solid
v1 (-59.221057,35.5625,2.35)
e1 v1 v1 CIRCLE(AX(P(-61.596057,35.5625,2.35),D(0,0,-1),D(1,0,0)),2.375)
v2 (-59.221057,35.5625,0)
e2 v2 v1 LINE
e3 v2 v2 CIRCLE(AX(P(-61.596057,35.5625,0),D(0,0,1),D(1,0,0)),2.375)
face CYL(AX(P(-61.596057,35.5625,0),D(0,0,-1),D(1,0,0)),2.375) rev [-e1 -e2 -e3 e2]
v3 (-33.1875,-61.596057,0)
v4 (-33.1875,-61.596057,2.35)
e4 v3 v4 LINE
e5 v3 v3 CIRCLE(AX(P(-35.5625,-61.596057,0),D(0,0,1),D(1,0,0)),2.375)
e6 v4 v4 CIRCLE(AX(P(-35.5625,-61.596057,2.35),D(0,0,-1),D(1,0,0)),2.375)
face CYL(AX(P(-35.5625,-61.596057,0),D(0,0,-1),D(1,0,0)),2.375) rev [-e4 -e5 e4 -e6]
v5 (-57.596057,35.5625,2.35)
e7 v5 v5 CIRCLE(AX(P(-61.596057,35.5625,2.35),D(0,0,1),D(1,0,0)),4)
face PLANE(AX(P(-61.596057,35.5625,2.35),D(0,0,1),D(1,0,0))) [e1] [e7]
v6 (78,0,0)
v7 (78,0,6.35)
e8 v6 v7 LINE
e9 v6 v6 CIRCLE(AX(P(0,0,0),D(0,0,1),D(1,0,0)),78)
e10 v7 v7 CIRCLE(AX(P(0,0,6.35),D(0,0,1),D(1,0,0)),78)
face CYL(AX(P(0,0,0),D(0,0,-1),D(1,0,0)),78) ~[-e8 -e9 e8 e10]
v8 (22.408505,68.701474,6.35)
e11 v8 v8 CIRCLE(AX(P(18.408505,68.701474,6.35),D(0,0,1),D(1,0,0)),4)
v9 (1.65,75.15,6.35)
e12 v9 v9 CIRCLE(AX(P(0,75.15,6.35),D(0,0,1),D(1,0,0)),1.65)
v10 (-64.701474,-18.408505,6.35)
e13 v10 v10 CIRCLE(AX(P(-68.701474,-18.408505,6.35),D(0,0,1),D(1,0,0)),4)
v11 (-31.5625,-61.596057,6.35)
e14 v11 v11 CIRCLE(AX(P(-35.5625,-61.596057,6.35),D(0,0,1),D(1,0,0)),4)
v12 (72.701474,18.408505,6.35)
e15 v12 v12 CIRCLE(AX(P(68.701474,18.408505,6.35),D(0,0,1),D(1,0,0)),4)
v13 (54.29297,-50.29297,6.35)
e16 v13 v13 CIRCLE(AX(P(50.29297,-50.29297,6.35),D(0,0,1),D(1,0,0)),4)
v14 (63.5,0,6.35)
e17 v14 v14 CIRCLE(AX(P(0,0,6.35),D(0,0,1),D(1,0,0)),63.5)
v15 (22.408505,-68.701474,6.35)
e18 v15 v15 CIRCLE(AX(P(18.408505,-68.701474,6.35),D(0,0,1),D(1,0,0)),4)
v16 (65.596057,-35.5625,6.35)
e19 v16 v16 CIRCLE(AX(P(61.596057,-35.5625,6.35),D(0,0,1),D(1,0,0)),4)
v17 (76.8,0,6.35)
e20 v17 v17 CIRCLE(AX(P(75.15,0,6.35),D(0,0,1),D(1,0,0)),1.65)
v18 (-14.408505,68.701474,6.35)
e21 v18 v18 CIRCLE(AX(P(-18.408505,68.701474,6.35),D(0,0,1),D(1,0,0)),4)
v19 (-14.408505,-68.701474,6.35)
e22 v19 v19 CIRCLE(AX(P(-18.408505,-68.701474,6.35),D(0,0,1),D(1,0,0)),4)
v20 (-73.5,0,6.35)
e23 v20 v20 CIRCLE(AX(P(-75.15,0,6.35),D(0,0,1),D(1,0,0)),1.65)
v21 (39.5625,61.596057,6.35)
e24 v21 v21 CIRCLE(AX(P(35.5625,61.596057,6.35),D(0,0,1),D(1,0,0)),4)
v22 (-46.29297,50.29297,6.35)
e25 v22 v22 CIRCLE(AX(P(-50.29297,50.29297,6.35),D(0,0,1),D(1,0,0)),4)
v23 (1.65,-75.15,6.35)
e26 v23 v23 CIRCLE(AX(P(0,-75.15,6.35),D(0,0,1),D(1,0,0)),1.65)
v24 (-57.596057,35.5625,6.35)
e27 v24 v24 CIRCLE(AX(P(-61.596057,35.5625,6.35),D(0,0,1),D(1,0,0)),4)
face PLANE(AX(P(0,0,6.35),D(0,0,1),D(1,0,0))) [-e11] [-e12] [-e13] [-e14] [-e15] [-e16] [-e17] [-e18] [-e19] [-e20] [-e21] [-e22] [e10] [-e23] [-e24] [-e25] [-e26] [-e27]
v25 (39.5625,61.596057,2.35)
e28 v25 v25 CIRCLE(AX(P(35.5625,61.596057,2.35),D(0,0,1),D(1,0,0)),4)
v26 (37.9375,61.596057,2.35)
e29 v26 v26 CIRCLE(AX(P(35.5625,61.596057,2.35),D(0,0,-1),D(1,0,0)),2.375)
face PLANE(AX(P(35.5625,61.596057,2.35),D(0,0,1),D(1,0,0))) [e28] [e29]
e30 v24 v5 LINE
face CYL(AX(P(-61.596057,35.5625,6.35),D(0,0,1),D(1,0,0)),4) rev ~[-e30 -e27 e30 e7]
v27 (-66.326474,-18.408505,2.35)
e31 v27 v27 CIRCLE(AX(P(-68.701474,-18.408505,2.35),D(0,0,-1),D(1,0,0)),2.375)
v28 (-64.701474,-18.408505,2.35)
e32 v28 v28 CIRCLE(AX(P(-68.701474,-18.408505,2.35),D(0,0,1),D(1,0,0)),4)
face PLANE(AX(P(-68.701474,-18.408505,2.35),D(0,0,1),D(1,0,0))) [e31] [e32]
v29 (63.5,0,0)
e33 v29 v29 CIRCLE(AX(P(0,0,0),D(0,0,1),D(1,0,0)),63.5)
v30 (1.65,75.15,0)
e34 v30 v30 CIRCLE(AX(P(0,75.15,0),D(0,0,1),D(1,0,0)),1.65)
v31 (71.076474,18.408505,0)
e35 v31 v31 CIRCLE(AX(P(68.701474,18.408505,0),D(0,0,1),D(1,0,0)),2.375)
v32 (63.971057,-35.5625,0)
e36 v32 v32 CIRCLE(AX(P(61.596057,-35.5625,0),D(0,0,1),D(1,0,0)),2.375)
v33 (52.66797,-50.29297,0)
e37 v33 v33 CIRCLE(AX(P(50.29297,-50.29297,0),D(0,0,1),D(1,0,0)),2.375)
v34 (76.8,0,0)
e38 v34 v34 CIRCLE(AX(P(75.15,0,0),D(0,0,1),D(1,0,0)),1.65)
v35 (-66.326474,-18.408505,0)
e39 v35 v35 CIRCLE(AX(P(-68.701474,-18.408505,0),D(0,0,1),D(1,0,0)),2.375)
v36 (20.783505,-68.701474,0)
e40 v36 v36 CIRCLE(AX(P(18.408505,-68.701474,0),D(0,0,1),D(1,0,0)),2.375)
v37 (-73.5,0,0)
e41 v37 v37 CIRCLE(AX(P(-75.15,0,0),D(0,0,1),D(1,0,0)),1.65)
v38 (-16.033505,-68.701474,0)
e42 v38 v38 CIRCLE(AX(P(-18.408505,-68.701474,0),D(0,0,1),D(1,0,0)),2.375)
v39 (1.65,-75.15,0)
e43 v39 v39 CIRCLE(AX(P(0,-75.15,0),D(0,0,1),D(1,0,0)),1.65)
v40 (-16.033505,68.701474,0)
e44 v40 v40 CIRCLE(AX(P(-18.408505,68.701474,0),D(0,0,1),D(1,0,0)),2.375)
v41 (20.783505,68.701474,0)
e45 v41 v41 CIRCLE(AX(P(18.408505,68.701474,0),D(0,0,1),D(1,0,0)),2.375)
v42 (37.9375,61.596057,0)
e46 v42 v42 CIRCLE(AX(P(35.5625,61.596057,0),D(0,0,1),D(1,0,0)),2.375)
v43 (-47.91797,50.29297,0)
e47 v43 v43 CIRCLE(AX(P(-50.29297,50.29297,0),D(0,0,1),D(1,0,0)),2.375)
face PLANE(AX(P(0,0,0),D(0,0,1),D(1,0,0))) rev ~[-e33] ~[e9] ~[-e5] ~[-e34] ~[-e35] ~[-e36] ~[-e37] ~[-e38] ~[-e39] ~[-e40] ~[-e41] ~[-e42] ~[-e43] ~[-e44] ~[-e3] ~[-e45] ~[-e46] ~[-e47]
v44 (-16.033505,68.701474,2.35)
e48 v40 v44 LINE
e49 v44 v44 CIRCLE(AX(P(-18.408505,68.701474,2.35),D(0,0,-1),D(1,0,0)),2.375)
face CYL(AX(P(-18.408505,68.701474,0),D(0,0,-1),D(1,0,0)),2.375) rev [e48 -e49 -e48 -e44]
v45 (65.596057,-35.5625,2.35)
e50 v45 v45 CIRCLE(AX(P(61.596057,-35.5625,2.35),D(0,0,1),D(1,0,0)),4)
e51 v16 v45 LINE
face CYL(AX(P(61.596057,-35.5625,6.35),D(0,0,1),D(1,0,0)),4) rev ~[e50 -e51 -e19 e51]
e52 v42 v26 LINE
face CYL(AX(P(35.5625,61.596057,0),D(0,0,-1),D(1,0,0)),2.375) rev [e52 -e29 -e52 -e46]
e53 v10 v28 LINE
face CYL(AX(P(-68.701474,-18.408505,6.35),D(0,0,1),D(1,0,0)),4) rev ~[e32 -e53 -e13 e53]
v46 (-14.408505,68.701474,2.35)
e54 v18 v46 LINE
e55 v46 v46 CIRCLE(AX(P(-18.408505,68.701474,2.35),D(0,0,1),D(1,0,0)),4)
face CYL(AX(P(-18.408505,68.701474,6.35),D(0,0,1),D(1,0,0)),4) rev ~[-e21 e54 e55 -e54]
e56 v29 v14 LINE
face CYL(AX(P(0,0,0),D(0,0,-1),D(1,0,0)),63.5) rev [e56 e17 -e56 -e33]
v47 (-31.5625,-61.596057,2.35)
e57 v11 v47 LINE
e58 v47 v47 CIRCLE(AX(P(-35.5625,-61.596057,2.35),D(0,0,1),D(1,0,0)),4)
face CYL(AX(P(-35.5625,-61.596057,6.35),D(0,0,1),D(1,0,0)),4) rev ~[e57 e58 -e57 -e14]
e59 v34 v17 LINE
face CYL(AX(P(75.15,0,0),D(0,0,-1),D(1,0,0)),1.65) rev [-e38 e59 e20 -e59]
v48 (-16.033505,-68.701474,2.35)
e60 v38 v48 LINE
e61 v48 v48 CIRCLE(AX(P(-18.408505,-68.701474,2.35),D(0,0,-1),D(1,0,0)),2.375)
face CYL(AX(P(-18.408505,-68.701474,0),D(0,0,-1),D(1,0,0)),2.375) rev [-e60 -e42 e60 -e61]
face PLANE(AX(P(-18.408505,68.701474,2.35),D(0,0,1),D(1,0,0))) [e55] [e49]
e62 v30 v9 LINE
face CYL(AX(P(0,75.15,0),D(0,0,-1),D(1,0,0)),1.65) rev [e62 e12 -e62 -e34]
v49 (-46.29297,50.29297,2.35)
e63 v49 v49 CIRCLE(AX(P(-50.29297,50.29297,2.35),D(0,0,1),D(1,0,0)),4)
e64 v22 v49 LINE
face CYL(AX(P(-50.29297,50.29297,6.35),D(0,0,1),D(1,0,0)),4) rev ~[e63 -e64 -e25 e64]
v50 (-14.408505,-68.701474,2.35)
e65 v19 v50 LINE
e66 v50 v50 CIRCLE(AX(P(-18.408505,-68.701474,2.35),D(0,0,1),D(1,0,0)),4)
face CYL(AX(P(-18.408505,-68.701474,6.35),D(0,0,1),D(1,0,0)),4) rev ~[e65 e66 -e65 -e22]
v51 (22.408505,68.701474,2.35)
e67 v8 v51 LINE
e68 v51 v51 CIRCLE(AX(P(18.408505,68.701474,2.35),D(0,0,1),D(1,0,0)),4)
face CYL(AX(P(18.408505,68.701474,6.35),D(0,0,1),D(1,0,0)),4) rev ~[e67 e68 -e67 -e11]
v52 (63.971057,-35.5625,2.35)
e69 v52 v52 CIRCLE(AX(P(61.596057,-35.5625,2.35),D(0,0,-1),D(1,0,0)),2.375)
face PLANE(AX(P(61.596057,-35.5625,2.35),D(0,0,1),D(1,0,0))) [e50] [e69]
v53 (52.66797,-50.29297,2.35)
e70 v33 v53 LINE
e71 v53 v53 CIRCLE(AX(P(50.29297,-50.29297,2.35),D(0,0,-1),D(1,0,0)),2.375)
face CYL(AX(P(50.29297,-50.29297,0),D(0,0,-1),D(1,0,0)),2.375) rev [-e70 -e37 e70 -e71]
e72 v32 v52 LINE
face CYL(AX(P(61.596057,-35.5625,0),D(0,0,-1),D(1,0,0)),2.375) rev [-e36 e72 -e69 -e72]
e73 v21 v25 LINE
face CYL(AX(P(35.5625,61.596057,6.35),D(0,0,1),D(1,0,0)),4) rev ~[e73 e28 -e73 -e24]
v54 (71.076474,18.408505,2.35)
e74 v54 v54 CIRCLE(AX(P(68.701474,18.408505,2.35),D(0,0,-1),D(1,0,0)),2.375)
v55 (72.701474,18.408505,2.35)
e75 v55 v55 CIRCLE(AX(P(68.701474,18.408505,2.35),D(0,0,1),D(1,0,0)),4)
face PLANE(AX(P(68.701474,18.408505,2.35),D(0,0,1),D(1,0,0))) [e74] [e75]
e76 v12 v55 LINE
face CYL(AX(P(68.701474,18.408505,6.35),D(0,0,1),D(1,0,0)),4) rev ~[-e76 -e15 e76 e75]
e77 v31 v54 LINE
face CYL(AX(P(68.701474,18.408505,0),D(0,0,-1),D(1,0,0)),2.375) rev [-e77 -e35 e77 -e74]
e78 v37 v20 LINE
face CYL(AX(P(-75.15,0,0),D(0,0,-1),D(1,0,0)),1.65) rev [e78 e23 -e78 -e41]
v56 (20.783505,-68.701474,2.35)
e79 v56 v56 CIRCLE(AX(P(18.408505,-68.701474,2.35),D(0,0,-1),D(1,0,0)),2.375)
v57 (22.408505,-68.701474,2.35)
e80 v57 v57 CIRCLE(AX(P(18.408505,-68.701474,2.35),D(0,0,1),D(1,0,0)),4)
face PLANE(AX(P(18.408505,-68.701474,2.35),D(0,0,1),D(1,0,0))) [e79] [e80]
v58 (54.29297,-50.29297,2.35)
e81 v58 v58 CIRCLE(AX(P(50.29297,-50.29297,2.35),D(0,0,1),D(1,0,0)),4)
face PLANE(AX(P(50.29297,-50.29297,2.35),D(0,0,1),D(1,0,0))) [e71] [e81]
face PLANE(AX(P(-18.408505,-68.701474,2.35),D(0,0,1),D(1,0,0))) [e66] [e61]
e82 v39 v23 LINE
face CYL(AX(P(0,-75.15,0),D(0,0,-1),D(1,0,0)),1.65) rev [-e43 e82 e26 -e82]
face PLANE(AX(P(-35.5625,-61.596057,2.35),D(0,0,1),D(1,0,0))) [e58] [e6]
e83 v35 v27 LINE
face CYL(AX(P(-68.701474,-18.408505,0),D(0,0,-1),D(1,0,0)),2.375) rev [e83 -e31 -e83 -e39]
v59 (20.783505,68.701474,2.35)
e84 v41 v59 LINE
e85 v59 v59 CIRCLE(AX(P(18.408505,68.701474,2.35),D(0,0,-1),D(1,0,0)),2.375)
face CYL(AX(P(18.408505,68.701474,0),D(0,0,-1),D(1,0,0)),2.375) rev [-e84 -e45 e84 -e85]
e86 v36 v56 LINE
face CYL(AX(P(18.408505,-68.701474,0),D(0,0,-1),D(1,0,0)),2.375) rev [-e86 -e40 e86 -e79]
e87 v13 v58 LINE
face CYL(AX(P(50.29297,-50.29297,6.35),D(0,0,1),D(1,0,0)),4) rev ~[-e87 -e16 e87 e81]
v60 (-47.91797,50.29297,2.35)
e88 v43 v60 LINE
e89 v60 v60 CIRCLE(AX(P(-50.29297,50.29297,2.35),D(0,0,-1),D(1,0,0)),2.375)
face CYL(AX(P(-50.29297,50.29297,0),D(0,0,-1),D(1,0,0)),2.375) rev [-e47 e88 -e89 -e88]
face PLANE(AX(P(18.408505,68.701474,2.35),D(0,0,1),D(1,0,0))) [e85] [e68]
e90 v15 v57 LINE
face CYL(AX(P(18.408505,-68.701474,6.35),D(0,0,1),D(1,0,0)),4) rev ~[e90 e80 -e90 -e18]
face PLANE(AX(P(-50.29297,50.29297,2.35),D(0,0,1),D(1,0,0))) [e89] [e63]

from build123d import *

# Parameters (mm, degrees)
F0_R     = 78
F0_R_2   = 2.375
F0_R_3   = 1.65
F0_R_4   = 63.5
F1_DEPTH = 6.35
F2_R     = 4
F3_DEPTH = 4


# Not quite as in the source:
# - a length typed as a fraction of an inch, garbled in the dataset ("3 / 203.2 mm" for 3/8 in), is restored


with BuildPart() as f1:
    # F0 (on Top) → F1 (new body)
    with BuildSketch(Plane.XY):
        Circle(F0_R)
        with Locations((-35.5625, -61.5960568442)):
            Circle(F0_R_2, mode=Mode.SUBTRACT)
        with Locations((-18.4085045829, -68.7014743948)):
            Circle(F0_R_2, mode=Mode.SUBTRACT)
        with Locations((-68.7014743948, -18.4085045829)):
            Circle(F0_R_2, mode=Mode.SUBTRACT)
        with Locations((0, -75.15)):
            Circle(F0_R_3, mode=Mode.SUBTRACT)
        with Locations((18.4085045829, -68.7014743948)):
            Circle(F0_R_2, mode=Mode.SUBTRACT)
        with Locations((50.2929698119, -50.2929698119)):
            Circle(F0_R_2, mode=Mode.SUBTRACT)
        with Locations((61.5960568442, -35.5625)):
            Circle(F0_R_2, mode=Mode.SUBTRACT)
        with Locations((-75.15, 0)):
            Circle(F0_R_3, mode=Mode.SUBTRACT)
        with Locations((-61.5960568442, 35.5625)):
            Circle(F0_R_2, mode=Mode.SUBTRACT)
        with Locations((-50.2929698119, 50.2929698119)):
            Circle(F0_R_2, mode=Mode.SUBTRACT)
        with Locations((-18.4085045829, 68.7014743948)):
            Circle(F0_R_2, mode=Mode.SUBTRACT)
        Circle(F0_R_4, mode=Mode.SUBTRACT)
        with Locations((75.15, 0)):
            Circle(F0_R_3, mode=Mode.SUBTRACT)
        with Locations((68.7014743948, 18.4085045829)):
            Circle(F0_R_2, mode=Mode.SUBTRACT)
        with Locations((0, 75.15)):
            Circle(F0_R_3, mode=Mode.SUBTRACT)
        with Locations((18.4085045829, 68.7014743948)):
            Circle(F0_R_2, mode=Mode.SUBTRACT)
        with Locations((35.5625, 61.5960568442)):
            Circle(F0_R_2, mode=Mode.SUBTRACT)
    extrude(amount=F1_DEPTH)

    # F2 (on face) → F3 (cut)
    with BuildSketch(Plane.XY.offset(6.35)):
        with Locations((68.7014743948, 18.4085045829)):
            Circle(F2_R)
        with Locations((35.5625, 61.5960568442)):
            Circle(F2_R)
        with Locations((18.4085045829, 68.7014743948)):
            Circle(F2_R)
        with Locations((-18.4085045829, 68.7014743948)):
            Circle(F2_R)
        with Locations((-50.2929698119, 50.2929698119)):
            Circle(F2_R)
        with Locations((-61.5960568442, 35.5625)):
            Circle(F2_R)
        with Locations((-68.7014743948, -18.4085045829)):
            Circle(F2_R)
        with Locations((-35.5625, -61.5960568442)):
            Circle(F2_R)
        with Locations((-18.4085045829, -68.7014743948)):
            Circle(F2_R)
        with Locations((18.4085045829, -68.7014743948)):
            Circle(F2_R)
        with Locations((50.2929698119, -50.2929698119)):
            Circle(F2_R)
        with Locations((61.5960568442, -35.5625)):
            Circle(F2_R)
    extrude(amount=-F3_DEPTH, mode=Mode.SUBTRACT)


solid = f1.part
